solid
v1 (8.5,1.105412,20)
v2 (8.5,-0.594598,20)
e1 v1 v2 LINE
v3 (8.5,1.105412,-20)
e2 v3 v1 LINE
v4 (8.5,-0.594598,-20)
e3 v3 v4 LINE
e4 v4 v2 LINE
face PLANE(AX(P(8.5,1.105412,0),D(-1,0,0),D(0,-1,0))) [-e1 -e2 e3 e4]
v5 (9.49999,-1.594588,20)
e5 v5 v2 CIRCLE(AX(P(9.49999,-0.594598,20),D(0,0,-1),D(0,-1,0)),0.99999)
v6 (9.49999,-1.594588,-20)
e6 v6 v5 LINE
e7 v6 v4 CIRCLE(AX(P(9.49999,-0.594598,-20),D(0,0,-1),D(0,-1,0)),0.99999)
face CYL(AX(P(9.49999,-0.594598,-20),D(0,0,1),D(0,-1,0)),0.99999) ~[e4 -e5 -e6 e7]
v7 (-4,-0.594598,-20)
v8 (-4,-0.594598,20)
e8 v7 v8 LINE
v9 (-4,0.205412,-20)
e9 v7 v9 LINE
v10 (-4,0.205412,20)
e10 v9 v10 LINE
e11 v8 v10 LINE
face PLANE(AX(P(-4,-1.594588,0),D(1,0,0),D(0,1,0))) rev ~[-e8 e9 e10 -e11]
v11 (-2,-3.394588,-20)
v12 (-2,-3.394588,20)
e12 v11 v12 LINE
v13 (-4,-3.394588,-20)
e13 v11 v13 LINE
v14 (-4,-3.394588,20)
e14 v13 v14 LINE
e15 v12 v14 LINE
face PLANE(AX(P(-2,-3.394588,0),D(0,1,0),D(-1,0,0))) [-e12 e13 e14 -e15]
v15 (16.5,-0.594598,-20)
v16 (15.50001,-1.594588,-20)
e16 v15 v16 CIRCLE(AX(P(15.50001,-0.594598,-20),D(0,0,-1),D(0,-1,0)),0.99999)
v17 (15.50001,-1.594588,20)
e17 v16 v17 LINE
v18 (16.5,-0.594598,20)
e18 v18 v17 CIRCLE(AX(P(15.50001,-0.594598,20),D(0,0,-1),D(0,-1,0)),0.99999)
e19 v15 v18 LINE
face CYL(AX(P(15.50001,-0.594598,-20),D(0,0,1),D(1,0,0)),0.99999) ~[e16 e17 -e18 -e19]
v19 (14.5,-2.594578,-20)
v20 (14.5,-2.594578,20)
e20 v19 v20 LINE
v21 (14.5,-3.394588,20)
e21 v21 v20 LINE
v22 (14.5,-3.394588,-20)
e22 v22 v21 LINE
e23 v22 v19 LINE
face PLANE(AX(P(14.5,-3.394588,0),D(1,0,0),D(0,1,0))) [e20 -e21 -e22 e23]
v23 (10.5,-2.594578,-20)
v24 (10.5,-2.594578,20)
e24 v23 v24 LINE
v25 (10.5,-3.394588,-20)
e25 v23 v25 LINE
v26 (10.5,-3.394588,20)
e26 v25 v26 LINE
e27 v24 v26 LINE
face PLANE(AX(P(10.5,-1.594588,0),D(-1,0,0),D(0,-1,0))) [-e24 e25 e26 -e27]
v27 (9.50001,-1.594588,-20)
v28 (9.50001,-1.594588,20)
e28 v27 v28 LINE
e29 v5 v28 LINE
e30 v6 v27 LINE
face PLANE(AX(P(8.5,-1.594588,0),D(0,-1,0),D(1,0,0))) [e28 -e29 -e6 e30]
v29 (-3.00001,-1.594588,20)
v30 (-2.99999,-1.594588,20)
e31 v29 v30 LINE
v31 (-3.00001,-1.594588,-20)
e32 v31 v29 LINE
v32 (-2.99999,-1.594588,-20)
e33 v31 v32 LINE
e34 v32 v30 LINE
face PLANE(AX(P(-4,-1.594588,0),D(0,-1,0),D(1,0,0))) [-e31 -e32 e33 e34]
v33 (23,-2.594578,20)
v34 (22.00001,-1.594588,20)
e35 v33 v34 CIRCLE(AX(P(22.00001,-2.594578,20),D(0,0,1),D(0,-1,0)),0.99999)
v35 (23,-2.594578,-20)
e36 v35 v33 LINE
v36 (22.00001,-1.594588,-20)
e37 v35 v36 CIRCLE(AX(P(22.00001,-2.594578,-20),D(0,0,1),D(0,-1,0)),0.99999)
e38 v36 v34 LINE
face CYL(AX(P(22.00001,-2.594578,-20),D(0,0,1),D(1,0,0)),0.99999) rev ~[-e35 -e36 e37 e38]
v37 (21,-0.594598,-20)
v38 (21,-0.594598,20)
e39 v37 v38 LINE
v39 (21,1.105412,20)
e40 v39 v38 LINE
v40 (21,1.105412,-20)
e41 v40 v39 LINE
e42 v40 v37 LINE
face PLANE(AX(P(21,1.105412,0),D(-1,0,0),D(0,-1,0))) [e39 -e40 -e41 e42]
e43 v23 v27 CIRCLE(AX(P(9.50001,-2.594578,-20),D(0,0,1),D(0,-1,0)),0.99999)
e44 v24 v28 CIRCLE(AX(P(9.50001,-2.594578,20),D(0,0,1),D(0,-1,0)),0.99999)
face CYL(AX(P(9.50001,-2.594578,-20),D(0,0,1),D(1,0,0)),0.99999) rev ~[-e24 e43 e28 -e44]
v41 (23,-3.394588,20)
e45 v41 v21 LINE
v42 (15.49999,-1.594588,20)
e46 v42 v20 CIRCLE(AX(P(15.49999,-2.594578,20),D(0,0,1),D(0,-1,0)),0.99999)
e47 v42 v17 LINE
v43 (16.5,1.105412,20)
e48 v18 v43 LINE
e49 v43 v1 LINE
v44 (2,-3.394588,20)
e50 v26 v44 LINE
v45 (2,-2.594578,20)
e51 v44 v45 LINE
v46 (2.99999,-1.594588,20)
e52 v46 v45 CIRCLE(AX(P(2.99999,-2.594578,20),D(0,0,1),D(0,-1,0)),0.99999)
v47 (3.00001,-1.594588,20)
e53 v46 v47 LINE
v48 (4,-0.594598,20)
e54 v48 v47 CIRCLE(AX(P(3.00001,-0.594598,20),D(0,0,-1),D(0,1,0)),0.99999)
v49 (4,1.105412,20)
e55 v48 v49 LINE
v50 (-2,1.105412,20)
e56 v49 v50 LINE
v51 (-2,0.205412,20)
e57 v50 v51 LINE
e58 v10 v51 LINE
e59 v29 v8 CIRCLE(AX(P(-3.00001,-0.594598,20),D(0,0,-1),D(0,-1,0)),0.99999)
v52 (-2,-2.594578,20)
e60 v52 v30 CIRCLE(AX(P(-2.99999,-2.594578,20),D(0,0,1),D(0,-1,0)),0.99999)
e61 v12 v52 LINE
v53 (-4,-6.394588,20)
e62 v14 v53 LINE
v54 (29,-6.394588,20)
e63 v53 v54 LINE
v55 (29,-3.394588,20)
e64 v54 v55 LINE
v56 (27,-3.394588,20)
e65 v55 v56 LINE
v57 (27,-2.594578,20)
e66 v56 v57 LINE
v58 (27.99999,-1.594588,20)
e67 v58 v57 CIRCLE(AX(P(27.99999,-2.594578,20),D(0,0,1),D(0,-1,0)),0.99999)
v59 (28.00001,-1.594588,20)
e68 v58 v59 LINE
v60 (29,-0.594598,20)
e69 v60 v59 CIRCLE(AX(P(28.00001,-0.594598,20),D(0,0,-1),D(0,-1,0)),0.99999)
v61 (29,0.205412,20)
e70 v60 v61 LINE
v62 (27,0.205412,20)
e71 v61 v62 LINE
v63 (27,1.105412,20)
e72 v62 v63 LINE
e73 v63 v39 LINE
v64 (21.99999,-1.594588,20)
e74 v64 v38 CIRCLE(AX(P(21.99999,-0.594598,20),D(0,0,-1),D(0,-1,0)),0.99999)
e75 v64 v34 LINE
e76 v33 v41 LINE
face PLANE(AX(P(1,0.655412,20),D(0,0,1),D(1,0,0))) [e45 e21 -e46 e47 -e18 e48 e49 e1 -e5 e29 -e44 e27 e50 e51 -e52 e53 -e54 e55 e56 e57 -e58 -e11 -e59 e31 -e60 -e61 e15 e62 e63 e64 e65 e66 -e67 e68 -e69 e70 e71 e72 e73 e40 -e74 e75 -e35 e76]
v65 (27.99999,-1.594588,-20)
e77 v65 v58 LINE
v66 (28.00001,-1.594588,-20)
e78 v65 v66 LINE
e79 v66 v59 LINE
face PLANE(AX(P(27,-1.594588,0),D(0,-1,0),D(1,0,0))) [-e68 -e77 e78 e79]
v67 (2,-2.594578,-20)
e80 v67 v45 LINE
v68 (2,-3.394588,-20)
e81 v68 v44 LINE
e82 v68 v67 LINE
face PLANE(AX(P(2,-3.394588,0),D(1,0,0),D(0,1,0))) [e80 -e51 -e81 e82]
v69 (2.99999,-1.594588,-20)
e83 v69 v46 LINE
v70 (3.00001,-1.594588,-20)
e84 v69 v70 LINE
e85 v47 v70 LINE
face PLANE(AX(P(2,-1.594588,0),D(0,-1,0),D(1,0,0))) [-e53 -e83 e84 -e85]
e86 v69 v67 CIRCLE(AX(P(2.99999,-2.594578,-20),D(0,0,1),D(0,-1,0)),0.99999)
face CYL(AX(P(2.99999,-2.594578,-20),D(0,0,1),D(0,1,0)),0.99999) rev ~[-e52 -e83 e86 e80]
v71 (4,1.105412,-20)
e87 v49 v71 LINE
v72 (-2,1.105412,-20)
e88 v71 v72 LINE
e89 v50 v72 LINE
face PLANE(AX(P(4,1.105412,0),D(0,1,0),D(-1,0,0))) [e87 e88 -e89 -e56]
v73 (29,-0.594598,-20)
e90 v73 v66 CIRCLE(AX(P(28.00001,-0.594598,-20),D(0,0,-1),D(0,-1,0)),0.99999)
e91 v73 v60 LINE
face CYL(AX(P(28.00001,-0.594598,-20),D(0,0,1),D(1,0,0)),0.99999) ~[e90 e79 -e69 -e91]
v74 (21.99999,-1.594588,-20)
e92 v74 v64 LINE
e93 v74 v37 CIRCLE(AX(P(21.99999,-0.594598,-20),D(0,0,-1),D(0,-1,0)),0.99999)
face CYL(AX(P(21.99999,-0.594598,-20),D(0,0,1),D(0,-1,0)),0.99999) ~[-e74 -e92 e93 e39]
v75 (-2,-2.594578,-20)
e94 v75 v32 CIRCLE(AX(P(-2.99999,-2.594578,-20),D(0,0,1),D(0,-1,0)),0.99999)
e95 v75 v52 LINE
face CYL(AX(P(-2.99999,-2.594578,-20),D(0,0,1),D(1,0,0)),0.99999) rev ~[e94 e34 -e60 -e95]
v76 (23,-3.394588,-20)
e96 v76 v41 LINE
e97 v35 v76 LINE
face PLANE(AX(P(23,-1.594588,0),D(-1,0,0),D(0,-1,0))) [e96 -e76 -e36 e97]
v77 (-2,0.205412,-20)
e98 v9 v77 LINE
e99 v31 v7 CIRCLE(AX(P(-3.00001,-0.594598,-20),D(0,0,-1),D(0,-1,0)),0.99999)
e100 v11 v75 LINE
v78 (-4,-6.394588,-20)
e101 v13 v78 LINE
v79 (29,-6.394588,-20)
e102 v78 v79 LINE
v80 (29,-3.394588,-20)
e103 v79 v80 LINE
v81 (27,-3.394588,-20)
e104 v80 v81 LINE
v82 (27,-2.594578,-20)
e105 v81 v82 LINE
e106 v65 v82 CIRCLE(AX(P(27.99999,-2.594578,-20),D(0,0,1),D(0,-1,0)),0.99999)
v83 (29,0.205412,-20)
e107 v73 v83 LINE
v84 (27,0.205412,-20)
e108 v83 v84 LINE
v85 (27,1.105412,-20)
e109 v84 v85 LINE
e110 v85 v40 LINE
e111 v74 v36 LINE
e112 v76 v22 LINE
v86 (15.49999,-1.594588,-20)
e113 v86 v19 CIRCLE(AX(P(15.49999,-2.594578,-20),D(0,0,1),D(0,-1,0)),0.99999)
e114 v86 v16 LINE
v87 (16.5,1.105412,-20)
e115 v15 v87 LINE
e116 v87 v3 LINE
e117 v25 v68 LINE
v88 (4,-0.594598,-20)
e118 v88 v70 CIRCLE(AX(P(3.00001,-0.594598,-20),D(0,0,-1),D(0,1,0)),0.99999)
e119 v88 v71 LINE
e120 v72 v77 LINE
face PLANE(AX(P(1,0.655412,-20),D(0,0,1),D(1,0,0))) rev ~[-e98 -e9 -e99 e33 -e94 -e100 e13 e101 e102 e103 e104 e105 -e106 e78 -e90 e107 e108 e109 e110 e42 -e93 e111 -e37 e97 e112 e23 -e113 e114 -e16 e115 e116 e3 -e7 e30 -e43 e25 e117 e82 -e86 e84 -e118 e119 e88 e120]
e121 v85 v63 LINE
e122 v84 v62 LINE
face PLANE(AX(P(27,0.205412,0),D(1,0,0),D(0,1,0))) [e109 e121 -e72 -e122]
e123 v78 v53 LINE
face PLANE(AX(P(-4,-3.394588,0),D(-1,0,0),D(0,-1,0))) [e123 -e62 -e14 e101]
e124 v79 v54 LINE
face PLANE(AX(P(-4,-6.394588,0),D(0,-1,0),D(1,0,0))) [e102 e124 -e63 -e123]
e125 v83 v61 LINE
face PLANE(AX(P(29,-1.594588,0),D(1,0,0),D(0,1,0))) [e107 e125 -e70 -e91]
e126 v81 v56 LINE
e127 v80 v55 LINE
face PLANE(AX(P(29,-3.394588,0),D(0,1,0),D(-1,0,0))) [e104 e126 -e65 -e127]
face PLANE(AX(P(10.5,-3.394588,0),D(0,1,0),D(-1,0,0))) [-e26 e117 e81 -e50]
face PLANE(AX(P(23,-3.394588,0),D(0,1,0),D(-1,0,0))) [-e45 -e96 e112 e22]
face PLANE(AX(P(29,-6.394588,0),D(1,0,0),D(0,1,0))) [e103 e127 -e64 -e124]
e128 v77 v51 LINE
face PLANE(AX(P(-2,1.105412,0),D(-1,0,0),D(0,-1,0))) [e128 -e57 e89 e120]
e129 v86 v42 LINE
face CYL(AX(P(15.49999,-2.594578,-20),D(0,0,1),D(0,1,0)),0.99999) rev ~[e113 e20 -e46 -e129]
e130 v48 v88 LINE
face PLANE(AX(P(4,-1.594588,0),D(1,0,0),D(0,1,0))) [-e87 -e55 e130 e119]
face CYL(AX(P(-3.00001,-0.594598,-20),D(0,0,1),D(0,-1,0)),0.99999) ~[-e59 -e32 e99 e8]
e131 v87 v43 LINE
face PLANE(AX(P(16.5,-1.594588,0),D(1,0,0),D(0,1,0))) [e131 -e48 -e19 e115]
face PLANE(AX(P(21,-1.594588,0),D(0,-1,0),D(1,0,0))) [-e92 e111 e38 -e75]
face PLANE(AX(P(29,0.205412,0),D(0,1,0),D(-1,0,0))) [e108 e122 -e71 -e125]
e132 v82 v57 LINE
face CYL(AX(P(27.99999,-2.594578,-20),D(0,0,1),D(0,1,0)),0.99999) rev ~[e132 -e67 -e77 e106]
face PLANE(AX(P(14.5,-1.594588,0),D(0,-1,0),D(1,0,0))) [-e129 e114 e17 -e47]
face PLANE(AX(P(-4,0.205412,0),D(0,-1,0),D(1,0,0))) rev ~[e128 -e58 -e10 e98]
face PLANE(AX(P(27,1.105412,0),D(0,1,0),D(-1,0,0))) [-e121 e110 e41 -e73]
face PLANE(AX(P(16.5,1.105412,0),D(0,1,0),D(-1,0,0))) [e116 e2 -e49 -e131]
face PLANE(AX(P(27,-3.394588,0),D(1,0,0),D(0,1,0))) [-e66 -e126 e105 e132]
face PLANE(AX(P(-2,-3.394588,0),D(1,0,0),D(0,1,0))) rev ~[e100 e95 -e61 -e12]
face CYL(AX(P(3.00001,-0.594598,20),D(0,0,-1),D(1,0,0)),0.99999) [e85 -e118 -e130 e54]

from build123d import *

# Parameters (mm, degrees)
F0_W     = 4
F0_H     = 1.8
F0_W_2   = 2
F1_DEPTH = 20
F2_R     = 0.99999


# Not quite as in the source:
# - a fillet or chamfer is up to 0.001 mm smaller than in the source, because OpenCascade refuses the exact size


with BuildPart() as f1:
    # F0 (on Top) → F1 (new body, symmetric)
    with BuildSketch(Plane.XY):
        Polygon((-2, 1.1054119891), (-2, 0.2054119891), (2, 0.2054119891), (4, 0.2054119891), (4, 1.1054119891), align=None)
        with Locations((0, -0.6945880109)):
            Rectangle(F0_W, F0_H)
        with Locations((-3, -0.6945880109)):
            Rectangle(F0_W_2, F0_H)
        with Locations((3, -0.6945880109)):
            Rectangle(F0_W_2, F0_H)
        with Locations((0, -2.4945880109)):
            Rectangle(F0_W, F0_H)
        Polygon((2, -3.3945880109), (-2, -3.3945880109), (-4, -3.3945880109), (-4, -6.3945880109), (29, -6.3945880109), (29, -3.3945880109), (27, -3.3945880109), (23, -3.3945880109), (14.5, -3.3945880109), (10.5, -3.3945880109), align=None)
        with Locations((12.5, -2.4945880109)):
            Rectangle(F0_W, F0_H)
        with Locations((12.5, -0.6945880109)):
            Rectangle(F0_W, F0_H)
        with Locations((9.5, -0.6945880109)):
            Rectangle(F0_W_2, F0_H)
        with Locations((15.5, -0.6945880109)):
            Rectangle(F0_W_2, F0_H)
        with Locations((25, -2.4945880109)):
            Rectangle(F0_W, F0_H)
        Polygon((8.5, 0.2054119891), (10.5, 0.2054119891), (14.5, 0.2054119891), (16.5, 0.2054119891), (16.5, 1.1054119891), (8.5, 1.1054119891), align=None)
        with Locations((25, -0.6945880109)):
            Rectangle(F0_W, F0_H)
        with Locations((22, -0.6945880109)):
            Rectangle(F0_W_2, F0_H)
        with Locations((28, -0.6945880109)):
            Rectangle(F0_W_2, F0_H)
        Polygon((21, 0.2054119891), (23, 0.2054119891), (27, 0.2054119891), (27, 1.1054119891), (21, 1.1054119891), align=None)
    extrude(amount=F1_DEPTH, both=True)

    # F2 (radius 1 in the source; OpenCascade refuses exactly that, so slightly less here)
    f2_edges = [f1.edges().sort_by_distance(p)[0] for p in [
        (-2, -1.594588, 0),
        (2, -1.594588, 0),
        (10.5, -1.594588, 0),
        (14.5, -1.594588, 0),
        (23, -1.594588, 0),
        (27, -1.594588, 0),
        (8.5, -1.594588, 0),
        (-4, -1.594588, 0),
        (21, -1.594588, 0),
        (16.5, -1.594588, 0),
        (29, -1.594588, 0),
        (4, -1.594588, 0),
    ]]
    fillet(f2_edges, radius=F2_R)


solid = f1.part
